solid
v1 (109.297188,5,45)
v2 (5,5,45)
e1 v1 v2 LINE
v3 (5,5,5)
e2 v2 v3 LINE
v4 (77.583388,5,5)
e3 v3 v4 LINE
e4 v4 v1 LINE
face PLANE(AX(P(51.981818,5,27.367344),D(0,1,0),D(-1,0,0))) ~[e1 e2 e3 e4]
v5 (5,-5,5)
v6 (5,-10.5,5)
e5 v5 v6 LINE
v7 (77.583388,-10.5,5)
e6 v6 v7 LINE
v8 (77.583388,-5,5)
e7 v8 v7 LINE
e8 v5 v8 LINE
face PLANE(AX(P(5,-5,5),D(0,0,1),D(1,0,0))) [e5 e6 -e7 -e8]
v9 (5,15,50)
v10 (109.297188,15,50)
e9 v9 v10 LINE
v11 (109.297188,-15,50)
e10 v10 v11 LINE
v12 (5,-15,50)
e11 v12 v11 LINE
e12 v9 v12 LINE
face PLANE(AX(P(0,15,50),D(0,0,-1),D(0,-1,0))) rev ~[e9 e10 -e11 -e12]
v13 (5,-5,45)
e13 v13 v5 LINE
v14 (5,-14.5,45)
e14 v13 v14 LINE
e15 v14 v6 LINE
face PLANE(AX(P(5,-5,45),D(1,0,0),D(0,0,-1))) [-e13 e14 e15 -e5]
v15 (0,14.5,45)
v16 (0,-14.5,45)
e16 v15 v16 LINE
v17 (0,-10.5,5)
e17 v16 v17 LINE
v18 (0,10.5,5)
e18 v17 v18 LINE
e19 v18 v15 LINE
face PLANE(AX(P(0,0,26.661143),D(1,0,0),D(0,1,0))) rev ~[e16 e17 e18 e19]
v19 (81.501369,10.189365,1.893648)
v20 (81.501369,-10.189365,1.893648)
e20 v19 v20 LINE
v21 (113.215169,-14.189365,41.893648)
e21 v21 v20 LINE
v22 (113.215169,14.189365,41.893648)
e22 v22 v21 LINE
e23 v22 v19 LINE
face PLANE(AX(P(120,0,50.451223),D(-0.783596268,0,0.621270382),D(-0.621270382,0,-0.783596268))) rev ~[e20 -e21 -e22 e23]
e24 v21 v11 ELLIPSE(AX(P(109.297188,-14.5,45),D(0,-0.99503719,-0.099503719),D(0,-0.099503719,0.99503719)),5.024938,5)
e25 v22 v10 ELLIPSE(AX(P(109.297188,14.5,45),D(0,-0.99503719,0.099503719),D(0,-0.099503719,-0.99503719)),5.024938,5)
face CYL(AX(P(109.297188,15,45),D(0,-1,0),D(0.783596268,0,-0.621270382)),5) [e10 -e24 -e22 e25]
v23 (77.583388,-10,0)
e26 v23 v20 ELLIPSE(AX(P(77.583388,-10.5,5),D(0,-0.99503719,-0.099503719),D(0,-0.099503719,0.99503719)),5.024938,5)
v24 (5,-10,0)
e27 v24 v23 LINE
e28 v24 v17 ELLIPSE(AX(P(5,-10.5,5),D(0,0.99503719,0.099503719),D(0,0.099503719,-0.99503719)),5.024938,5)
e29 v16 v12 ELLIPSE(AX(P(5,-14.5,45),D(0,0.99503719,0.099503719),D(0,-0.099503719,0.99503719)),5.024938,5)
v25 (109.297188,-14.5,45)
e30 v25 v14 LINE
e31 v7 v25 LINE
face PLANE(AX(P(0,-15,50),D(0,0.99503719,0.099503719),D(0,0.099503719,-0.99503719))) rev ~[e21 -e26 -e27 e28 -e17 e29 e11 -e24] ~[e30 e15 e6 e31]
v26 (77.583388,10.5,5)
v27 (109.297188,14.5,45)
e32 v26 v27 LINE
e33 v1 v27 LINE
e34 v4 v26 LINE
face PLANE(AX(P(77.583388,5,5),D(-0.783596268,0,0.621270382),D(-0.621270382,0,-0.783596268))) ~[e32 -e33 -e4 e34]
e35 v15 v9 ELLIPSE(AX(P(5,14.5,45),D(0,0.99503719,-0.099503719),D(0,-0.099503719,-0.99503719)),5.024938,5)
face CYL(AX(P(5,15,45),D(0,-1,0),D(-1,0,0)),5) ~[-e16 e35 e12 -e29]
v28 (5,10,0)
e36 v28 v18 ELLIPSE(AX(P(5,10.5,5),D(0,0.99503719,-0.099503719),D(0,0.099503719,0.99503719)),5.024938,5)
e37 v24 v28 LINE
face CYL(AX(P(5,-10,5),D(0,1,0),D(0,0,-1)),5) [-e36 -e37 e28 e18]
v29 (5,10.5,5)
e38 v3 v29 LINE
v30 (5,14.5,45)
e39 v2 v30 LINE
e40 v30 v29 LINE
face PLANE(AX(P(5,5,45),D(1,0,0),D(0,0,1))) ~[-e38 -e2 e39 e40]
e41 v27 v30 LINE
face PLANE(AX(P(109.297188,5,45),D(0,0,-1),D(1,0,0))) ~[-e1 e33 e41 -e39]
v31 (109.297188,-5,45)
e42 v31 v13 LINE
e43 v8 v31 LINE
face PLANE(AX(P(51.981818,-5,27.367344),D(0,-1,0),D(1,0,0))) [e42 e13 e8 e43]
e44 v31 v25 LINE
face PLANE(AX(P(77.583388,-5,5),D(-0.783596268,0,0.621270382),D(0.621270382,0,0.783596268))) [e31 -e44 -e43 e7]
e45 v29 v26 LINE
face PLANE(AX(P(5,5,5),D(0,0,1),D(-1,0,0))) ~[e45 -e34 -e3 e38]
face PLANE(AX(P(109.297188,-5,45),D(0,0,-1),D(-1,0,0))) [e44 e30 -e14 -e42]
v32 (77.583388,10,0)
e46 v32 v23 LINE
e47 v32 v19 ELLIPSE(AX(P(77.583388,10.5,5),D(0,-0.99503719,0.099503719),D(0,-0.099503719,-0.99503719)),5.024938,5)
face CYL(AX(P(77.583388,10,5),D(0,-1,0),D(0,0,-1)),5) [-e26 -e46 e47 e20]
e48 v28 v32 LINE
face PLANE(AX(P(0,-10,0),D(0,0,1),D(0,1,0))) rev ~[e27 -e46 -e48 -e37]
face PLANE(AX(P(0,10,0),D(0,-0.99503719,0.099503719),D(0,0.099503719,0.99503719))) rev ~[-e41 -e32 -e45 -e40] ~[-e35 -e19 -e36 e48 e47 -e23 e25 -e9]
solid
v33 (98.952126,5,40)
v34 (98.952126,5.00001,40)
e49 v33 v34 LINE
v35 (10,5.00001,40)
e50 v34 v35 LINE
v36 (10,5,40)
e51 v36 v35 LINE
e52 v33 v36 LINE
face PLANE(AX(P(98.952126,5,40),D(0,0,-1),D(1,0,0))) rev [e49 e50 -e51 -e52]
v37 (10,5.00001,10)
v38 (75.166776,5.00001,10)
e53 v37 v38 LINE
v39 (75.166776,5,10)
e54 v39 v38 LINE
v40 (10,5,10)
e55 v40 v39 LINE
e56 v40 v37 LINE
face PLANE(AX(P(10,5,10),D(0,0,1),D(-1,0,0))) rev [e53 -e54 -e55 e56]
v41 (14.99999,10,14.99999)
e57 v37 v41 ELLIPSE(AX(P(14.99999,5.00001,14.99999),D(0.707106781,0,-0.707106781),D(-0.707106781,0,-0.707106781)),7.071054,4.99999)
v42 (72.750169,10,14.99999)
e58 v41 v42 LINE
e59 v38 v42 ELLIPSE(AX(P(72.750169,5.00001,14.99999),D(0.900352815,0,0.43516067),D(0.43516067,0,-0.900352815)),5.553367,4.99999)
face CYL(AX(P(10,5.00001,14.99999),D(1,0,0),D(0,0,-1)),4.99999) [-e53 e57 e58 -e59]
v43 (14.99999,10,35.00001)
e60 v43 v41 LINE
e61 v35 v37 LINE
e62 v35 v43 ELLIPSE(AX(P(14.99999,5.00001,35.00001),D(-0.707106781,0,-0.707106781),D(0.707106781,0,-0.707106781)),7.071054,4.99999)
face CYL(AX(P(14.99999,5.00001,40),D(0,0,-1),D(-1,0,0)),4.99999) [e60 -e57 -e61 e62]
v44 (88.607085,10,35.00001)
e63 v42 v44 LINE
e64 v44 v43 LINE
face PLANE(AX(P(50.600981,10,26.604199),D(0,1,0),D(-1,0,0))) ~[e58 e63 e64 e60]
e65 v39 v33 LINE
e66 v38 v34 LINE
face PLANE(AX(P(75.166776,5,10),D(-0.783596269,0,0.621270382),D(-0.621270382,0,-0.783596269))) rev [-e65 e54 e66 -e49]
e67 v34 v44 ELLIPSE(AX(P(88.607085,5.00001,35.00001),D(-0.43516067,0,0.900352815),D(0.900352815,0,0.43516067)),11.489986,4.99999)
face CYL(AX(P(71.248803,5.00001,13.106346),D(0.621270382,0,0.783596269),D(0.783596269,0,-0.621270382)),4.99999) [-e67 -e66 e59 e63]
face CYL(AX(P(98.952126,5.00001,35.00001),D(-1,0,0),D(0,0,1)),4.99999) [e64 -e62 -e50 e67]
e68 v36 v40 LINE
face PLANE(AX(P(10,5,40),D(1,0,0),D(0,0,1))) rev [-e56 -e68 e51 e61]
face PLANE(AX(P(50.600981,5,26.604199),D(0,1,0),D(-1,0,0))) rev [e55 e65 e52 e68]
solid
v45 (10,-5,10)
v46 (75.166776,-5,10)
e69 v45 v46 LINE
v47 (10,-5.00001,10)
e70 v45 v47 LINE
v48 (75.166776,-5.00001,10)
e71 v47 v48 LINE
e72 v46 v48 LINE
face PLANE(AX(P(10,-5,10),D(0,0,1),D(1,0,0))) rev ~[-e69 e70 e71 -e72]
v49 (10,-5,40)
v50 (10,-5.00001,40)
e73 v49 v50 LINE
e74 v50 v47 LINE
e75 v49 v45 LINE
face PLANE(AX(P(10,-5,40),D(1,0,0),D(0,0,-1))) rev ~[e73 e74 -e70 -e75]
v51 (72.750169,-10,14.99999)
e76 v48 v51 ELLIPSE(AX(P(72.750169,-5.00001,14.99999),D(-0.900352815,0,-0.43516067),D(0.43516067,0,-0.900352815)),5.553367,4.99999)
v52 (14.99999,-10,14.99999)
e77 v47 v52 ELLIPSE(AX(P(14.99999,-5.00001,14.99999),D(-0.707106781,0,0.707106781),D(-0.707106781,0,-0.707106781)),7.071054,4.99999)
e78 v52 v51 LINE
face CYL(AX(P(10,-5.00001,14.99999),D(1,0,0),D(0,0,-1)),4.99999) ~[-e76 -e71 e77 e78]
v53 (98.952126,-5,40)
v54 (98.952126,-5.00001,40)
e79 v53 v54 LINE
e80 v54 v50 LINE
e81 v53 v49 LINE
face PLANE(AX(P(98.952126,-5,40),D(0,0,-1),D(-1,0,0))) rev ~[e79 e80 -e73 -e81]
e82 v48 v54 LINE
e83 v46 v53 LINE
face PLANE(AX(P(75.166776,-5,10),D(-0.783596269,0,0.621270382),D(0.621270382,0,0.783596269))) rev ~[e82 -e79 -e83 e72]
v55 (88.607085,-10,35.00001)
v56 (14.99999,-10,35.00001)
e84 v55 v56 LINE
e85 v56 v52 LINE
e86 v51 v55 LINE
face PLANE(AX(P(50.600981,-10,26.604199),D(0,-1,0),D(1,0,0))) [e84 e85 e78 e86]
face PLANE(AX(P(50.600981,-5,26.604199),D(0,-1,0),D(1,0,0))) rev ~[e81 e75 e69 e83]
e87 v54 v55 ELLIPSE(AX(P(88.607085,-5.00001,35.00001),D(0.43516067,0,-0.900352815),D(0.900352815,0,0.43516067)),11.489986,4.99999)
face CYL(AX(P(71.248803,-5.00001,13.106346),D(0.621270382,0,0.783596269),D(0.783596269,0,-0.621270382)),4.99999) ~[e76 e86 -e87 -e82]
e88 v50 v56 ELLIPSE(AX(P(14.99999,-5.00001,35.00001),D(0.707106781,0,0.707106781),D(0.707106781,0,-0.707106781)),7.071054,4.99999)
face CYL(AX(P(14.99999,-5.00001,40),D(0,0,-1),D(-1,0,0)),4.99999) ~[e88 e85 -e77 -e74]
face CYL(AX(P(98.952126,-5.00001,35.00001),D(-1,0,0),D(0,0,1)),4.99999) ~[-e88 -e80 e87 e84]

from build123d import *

# Parameters (mm, degrees)
F2_DEPTH      = 120
F4_DEPTH      = 15.001
F4_DEPTH_BACK = 15.001
F6_DEPTH      = 25
F8_DEPTH      = 5
F9_R          = 4.99999
F11_R         = 5


# Not quite as in the source:
# - a fillet or chamfer is up to 0.001 mm smaller than in the source, because OpenCascade refuses the exact size
# - a pattern or mirror of a feature is missing from the dataset's text; its kind, count and spacing are read off the source's solid


with BuildPart() as f2:
    # F1 (on Right) → F2 (new body)
    with BuildSketch(Plane.YZ):
        Polygon((-10, 0), (0, 0), (10, 0), (15, 50), (0, 50), (-15, 50), align=None)
    extrude(amount=F2_DEPTH)

    # F3 (on Front) → F4 (cut, two sides)
    with BuildSketch(Plane.XZ) as f4_sk:
        Polygon((120, 50.4512232197), (80, 0), (120, 0), align=None)
    extrude(amount=-F4_DEPTH, mode=Mode.SUBTRACT)
    extrude(f4_sk.sketch, amount=F4_DEPTH_BACK, mode=Mode.SUBTRACT)

    # F5 (on offset) → F6 (cut)
    with BuildSketch(Plane.XZ.offset(5)):
        Polygon((5, 45), (5, 5), (77.5833880732, 5), (109.2971880149, 45), align=None)
    f6 = extrude(amount=F6_DEPTH, mode=Mode.SUBTRACT)

    # F6_copies: F6 across plane
    add(f6.mirror(Plane.ZX), mode=Mode.SUBTRACT)

    # F11
    f11_edges = [f2.edges().sort_by_distance(p)[0] for p in [
        (119.64225, 0, 50),
        (80, 0, 0),
        (0, 0, 0),
        (0, 0, 50),
    ]]
    fillet(f11_edges, radius=F11_R)


with BuildPart() as f8:
    # F7 (on face) → F8 (new body)
    with BuildSketch(Plane.XZ.offset(5)):
        Polygon((10, 40), (10, 10), (75.1667761465, 10), (98.9521261027, 40), align=None)
    extrude(amount=F8_DEPTH)

    # F9 (radius 5 in the source; OpenCascade refuses exactly that, so slightly less here)
    f9_edges = [f8.edges().sort_by_distance(p)[0] for p in [
        (10, -10, 25),
        (42.583388, -10, 10),
        (87.059451, -10, 25),
        (54.476063, -10, 40),
    ]]
    fillet(f9_edges, radius=F9_R)


with BuildPart() as f10_1:
    # F10: instance of F8
    add(f8.part.mirror(Plane.XZ))


solid = Compound([f2.part, f8.part, f10_1.part])
